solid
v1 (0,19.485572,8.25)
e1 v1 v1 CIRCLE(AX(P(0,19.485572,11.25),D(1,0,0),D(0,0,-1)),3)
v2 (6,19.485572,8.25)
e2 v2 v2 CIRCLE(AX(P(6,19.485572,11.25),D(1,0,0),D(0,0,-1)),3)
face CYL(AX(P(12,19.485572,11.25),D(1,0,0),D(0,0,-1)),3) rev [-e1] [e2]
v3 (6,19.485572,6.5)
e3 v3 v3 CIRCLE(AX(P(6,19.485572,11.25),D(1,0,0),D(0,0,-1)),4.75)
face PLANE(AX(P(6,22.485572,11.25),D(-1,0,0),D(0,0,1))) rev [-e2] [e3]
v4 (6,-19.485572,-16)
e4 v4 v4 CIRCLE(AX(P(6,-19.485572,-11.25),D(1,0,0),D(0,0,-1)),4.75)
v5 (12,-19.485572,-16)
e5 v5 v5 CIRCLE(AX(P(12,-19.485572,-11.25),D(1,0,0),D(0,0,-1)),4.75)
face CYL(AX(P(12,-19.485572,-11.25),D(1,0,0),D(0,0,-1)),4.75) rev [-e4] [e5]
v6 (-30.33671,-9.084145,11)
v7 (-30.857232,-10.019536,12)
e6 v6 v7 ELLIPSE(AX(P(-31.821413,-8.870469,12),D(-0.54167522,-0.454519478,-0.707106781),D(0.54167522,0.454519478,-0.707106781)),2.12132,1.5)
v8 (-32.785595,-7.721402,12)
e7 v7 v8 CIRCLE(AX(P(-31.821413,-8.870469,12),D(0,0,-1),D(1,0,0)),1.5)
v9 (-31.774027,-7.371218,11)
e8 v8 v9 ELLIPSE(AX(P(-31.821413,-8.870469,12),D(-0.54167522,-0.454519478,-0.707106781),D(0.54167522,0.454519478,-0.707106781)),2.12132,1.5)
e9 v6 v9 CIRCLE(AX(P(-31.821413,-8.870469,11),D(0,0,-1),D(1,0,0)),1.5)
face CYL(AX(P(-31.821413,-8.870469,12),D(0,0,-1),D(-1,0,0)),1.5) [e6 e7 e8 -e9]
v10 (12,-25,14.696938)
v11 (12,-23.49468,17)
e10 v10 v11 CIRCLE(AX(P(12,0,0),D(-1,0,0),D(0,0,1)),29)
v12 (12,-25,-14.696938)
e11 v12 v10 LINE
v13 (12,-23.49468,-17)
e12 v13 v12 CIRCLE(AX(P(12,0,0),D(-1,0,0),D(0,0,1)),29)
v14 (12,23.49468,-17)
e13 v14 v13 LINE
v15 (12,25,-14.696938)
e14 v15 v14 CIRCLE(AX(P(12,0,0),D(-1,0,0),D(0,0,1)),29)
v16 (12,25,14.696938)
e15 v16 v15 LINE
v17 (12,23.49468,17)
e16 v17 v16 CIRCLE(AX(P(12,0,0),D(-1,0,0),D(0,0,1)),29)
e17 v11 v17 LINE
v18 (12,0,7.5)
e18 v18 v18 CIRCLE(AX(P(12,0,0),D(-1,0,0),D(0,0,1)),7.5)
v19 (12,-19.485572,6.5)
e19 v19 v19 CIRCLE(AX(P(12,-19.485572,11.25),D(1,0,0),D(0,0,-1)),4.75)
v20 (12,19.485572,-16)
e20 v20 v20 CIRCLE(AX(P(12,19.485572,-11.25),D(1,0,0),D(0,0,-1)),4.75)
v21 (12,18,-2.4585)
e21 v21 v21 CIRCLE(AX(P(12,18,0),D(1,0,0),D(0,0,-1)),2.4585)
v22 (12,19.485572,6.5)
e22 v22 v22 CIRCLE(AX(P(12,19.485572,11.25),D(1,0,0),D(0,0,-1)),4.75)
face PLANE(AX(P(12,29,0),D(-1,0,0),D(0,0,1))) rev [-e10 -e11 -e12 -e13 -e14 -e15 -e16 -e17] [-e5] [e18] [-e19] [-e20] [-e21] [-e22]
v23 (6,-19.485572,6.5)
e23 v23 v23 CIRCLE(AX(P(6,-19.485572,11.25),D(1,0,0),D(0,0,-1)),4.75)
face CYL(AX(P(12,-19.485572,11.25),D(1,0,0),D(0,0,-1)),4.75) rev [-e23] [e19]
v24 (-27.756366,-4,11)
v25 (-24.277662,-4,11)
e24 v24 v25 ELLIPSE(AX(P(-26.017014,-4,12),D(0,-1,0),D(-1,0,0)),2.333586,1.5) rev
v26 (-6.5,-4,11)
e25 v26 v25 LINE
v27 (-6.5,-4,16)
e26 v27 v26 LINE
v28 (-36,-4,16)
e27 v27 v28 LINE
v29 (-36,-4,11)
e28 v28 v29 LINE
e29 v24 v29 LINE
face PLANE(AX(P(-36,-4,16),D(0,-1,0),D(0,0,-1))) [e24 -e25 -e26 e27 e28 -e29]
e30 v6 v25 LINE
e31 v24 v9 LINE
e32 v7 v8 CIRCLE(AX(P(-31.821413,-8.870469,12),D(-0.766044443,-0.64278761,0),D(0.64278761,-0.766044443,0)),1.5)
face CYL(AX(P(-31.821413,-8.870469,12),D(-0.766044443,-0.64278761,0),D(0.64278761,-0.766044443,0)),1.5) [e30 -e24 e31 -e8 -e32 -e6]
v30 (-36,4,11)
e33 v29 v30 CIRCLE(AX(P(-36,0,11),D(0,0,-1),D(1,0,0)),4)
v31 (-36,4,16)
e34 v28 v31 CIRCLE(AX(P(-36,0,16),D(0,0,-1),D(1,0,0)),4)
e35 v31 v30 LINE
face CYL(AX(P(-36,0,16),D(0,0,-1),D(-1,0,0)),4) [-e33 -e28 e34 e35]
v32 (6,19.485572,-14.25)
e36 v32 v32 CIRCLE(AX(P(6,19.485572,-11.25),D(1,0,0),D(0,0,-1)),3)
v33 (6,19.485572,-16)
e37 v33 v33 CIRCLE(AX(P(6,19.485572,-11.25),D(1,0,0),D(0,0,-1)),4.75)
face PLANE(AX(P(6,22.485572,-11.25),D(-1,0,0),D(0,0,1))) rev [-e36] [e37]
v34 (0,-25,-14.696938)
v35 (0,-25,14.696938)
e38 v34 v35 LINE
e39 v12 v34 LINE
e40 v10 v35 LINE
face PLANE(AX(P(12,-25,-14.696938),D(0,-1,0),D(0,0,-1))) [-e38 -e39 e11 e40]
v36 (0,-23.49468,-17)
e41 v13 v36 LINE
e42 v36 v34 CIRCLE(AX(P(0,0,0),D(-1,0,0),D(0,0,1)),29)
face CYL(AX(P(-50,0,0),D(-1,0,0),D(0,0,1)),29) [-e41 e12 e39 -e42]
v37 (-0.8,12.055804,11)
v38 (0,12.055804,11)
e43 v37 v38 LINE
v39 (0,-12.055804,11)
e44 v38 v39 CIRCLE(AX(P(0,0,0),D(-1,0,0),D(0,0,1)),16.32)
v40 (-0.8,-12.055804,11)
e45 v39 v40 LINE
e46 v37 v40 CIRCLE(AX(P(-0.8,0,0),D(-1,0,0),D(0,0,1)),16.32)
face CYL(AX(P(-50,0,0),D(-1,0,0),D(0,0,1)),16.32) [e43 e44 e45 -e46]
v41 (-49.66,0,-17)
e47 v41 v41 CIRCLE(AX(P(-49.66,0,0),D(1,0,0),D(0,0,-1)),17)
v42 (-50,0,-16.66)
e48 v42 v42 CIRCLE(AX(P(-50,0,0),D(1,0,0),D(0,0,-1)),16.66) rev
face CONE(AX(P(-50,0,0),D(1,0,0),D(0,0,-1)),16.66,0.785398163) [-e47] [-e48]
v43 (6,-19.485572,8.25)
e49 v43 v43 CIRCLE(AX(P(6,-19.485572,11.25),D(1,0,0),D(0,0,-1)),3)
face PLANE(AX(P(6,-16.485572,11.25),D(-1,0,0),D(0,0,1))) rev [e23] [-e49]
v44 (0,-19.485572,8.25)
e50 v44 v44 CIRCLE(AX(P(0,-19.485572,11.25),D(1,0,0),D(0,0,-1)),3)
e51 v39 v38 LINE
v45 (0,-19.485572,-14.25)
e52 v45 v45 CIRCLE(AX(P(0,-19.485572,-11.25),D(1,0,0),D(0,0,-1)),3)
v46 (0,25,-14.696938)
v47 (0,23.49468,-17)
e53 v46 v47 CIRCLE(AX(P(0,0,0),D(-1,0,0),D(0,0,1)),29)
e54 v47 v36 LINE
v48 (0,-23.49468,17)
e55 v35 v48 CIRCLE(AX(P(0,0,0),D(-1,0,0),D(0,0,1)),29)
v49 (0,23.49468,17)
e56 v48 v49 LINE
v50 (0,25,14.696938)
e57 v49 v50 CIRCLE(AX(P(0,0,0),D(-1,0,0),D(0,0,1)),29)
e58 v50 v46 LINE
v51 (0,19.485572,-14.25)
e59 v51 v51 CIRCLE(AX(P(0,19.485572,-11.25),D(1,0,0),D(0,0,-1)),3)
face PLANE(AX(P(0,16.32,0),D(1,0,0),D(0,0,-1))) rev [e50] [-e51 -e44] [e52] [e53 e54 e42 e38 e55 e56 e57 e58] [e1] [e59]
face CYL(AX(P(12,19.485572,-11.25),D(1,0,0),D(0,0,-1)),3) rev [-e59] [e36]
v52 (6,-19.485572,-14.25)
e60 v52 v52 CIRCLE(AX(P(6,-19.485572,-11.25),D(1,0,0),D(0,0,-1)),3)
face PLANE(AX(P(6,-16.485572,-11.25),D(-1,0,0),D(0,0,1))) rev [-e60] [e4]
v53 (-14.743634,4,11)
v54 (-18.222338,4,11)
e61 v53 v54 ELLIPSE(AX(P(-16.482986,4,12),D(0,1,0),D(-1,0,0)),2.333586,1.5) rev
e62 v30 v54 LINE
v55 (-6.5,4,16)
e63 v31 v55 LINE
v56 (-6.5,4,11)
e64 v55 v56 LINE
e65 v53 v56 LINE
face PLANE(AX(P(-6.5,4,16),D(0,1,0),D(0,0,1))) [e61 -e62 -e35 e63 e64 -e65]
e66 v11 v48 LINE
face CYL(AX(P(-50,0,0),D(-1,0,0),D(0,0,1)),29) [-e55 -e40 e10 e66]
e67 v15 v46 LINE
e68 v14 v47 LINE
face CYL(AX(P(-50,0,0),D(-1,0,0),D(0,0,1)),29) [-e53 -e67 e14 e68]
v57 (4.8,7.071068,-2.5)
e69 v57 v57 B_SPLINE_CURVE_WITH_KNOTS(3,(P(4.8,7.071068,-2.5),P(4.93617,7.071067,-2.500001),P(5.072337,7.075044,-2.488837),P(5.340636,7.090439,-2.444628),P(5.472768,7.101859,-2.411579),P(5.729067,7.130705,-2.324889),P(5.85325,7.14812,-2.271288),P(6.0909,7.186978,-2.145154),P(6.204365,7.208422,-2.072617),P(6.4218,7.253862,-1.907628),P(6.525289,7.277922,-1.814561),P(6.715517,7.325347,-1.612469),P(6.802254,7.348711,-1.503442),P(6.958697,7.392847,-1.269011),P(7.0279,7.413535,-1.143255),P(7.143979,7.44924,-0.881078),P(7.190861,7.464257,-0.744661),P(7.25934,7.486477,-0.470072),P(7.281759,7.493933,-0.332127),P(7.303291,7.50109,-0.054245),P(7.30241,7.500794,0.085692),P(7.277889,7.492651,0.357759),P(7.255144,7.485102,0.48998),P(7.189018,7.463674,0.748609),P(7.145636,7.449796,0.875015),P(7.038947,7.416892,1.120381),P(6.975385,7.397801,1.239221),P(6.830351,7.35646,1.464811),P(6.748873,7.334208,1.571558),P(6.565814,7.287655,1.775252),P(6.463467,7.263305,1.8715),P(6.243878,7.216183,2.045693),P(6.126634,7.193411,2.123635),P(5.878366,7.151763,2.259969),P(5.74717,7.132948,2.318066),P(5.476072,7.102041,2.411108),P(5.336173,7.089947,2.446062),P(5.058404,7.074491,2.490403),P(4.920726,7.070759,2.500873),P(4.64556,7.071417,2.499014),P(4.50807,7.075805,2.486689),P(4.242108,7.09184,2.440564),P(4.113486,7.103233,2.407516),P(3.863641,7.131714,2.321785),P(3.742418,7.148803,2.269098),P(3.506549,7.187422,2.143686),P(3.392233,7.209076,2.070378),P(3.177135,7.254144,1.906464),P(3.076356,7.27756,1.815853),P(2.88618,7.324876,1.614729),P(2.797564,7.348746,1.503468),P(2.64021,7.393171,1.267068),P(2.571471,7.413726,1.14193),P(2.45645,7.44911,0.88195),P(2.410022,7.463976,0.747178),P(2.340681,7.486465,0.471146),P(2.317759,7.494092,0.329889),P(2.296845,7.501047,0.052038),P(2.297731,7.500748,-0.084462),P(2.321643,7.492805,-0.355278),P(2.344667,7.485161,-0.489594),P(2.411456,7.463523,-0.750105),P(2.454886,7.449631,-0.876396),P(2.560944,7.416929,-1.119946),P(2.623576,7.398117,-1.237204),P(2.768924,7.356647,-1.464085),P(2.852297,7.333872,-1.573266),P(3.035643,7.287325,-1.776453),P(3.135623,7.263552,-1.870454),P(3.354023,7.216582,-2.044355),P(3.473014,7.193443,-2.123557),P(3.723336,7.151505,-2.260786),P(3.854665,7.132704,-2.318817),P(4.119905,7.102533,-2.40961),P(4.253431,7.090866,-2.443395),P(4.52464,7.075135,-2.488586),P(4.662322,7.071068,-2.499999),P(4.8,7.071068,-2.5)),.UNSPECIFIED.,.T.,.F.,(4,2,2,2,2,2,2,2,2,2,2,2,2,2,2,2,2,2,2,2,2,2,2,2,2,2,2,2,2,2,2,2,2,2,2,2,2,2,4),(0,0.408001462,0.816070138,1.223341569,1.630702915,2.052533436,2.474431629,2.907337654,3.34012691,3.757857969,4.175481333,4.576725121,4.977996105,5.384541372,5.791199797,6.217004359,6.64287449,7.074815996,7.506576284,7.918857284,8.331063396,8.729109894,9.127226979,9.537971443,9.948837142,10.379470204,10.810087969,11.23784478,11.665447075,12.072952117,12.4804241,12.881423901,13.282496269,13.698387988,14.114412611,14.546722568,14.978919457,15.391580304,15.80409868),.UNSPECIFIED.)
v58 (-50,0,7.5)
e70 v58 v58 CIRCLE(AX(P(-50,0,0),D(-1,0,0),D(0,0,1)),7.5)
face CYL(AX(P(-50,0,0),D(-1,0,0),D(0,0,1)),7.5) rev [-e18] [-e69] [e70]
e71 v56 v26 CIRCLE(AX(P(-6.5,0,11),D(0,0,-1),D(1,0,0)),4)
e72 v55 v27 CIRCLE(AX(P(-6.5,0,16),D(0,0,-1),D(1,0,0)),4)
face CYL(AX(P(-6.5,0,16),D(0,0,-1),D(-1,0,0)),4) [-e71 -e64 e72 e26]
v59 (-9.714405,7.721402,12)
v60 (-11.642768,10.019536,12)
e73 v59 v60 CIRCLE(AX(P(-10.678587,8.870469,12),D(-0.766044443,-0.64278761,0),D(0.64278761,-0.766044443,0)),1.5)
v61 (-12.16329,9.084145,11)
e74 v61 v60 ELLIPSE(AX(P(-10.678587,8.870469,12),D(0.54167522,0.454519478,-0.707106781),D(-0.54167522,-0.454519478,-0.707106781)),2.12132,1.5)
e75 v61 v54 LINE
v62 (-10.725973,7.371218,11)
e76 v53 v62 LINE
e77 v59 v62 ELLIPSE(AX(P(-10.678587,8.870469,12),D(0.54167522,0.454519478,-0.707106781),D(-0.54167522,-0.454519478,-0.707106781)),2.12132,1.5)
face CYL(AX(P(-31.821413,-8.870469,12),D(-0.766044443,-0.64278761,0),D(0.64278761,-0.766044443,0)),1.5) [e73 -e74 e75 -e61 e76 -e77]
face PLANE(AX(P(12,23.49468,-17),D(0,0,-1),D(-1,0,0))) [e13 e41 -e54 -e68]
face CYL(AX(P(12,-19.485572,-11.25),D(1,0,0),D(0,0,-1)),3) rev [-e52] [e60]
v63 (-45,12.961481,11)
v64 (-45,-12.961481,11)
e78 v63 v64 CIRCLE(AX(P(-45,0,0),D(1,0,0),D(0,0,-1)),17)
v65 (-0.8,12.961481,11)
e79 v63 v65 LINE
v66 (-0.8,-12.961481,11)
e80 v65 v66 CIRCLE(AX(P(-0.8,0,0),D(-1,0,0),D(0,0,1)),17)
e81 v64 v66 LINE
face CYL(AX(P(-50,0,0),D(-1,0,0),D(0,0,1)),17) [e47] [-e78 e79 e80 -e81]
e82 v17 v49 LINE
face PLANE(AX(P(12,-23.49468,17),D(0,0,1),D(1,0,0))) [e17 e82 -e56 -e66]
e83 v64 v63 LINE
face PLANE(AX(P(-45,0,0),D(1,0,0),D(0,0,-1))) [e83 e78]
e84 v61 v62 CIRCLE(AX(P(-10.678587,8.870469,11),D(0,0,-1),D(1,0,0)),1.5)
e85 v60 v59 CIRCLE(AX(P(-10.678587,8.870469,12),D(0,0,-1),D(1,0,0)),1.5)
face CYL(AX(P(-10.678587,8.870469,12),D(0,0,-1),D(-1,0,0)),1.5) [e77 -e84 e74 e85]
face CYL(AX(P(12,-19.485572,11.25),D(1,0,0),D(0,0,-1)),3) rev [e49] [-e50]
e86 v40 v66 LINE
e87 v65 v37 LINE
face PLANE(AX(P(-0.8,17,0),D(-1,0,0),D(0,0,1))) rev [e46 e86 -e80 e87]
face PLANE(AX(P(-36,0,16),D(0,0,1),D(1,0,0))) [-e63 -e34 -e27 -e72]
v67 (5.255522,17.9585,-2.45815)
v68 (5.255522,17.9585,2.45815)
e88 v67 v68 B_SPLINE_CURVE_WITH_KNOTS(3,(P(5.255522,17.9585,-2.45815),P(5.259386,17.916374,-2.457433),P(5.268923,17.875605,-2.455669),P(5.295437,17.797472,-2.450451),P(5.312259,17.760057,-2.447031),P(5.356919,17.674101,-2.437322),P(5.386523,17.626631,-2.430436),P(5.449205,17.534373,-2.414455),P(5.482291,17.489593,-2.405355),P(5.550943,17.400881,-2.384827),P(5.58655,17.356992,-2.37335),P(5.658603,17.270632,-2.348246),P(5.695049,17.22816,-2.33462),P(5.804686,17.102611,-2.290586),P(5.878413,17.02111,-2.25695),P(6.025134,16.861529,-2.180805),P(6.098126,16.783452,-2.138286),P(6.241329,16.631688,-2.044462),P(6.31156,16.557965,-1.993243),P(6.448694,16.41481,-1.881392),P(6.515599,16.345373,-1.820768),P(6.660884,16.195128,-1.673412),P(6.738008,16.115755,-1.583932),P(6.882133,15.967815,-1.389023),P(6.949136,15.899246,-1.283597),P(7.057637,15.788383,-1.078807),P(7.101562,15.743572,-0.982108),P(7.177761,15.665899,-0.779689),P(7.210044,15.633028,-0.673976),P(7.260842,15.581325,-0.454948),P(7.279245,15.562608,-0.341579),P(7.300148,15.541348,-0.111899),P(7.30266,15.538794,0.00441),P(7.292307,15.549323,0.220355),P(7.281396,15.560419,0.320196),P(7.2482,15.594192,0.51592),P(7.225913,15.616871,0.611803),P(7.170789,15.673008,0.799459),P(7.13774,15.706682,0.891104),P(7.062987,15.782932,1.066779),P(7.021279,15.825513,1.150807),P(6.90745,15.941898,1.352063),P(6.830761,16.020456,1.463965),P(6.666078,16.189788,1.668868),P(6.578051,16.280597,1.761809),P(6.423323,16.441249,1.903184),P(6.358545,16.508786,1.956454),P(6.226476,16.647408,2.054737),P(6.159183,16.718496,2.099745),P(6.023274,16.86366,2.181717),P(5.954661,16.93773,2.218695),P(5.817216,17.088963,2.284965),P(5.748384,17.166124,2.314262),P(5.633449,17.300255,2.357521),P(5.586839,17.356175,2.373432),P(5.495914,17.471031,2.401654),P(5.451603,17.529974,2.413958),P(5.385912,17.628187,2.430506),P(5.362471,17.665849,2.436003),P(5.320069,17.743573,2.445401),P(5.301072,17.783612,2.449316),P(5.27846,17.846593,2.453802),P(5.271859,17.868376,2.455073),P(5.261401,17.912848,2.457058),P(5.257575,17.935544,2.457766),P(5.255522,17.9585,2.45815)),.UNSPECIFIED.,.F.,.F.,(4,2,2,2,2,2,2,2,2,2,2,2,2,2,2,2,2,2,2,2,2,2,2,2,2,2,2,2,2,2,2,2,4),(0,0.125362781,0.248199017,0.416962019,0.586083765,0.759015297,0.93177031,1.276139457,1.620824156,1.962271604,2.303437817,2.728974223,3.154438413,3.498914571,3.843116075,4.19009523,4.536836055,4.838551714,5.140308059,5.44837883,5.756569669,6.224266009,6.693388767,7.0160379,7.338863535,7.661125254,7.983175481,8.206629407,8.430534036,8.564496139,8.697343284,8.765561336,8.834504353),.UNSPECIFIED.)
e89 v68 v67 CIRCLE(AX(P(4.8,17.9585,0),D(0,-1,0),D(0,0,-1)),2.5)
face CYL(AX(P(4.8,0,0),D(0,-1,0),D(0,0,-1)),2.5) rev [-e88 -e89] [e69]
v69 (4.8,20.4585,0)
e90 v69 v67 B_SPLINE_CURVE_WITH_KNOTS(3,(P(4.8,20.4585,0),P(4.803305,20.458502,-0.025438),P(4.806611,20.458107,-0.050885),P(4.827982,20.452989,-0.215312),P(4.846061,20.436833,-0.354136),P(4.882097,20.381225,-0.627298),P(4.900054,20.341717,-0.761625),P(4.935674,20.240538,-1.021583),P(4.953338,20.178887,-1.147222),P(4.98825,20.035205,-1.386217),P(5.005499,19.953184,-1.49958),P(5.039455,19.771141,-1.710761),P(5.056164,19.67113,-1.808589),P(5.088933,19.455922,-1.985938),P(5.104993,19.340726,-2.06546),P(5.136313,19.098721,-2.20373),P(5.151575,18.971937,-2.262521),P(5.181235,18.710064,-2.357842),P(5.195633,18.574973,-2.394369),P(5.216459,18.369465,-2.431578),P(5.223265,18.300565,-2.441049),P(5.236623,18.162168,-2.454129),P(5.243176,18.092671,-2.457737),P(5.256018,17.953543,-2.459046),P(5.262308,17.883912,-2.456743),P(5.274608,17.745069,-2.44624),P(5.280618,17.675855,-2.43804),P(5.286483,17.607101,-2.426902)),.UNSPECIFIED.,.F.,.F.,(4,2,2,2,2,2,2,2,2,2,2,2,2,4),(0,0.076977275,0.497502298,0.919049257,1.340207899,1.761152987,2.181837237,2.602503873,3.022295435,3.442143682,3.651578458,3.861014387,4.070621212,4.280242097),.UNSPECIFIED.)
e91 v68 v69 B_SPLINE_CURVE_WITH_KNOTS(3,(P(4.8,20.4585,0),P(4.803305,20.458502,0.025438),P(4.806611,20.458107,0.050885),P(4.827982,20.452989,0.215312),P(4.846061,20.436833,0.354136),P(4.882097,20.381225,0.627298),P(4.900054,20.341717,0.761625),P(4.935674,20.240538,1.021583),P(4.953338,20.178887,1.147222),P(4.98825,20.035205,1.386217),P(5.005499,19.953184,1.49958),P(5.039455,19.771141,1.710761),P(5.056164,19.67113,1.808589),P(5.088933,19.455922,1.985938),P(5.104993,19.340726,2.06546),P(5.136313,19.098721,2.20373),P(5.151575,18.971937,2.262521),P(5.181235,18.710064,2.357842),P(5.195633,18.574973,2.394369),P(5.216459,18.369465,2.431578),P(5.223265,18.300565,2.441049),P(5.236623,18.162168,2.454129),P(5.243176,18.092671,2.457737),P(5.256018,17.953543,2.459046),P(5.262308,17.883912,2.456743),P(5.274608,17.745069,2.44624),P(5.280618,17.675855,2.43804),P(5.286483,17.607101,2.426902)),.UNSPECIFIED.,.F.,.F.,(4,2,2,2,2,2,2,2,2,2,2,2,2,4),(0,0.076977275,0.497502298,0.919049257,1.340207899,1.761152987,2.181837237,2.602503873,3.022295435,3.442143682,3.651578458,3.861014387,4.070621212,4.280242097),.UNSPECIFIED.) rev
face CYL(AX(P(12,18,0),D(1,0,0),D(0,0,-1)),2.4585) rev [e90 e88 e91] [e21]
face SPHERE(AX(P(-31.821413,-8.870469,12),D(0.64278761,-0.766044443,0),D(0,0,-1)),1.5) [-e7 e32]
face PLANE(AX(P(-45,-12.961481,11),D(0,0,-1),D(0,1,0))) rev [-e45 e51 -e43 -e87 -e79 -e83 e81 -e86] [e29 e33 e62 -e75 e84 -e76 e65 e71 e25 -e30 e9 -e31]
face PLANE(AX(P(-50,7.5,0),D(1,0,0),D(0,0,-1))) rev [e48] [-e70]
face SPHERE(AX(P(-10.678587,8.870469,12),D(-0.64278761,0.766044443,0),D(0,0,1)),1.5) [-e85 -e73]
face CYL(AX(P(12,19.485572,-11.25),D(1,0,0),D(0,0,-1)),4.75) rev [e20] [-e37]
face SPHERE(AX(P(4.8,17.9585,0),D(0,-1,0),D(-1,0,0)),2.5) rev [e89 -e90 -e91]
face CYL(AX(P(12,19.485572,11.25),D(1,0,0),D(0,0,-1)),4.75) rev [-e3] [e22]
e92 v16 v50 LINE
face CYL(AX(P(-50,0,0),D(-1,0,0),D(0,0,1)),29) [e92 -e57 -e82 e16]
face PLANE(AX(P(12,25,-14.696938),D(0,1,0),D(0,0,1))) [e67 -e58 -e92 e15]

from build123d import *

# Parameters (mm, degrees)
CUT_EXTRUDE1_DEPTH                 = 65.668384857
CHAMFER1_SIZE                      = 0.34
SOCKET_HEAD_CAP_SCREW1_D           = 6
SOCKET_HEAD_CAP_SCREW1_CBORE_D     = 9.5
SOCKET_HEAD_CAP_SCREW1_CBORE_DEPTH = 6
CUT_EXTRUDE2_DEPTH                 = 45
BOSS_EXTRUDE1_DEPTH                = 5
SKETCH7_R                          = 1.5
BOSS_EXTRUDE2_DEPTH                = 1
REVOLVE3_ANGLE                     = 90
REVOLVE4_ANGLE                     = 90
TAP1_START                         = 4.7999999
TAP1_OUTLINE_R                     = 2.4585
TAP1_DEPTH                         = 7.2000001


# Read off the part's stored shape, not the designer's step: Tap1
with BuildPart() as part:
    # Sketch1 → Revolve1 (revolve)
    with BuildSketch(Plane.XY, mode=Mode.PRIVATE) as revolve1_sk:
        Polygon((0, 29), (12, 29), (12, 7.5), (-50, 7.5), (-50, 17), (-0.8, 17), (-0.8, 16.32), (0, 16.32), align=None)
    revolve(revolve1_sk.sketch.rotate(Axis((-50, 0, 0), (1, 0, 0)), 90), axis=Axis((-50, 0, 0), (1, 0, 0)))

    # Sketch2 → Cut-Extrude1 (cut, through all)
    with BuildSketch(Plane(origin=(0, 0, 0), x_dir=(0, 0, -1), z_dir=(1, 0, 0))):
        with BuildLine():
            Line((14.696938457, 25), (-14.696938457, 25))
            ThreePointArc((-14.696938457, 25), (0, 29), (14.696938457, 25))
        make_face()
        with BuildLine():
            Line((17, 23.494680249), (17, -23.494680249))
            ThreePointArc((17, -23.494680249), (29, 0), (17, 23.494680249))
        make_face()
        with BuildLine():
            Line((14.696938457, -25), (-14.696938457, -25))
            ThreePointArc((-14.696938457, -25), (0, -29), (14.696938457, -25))
        make_face()
        with BuildLine():
            Line((-17, -23.494680249), (-17, 23.494680249))
            ThreePointArc((-17, 23.494680249), (-29, 0), (-17, -23.494680249))
        make_face()
    extrude(amount=CUT_EXTRUDE1_DEPTH, mode=Mode.SUBTRACT)

    # Chamfer1
    chamfer1_edges = [part.edges().sort_by_distance(p)[0] for p in [
        (-50, 0, -17),
    ]]
    chamfer(chamfer1_edges, length=CHAMFER1_SIZE)

    # Socket Head Cap Screw1 (through all)
    with Locations(Plane(origin=(12, 0, 0), x_dir=(0, 0, -1), z_dir=(1, 0, 0))):
        with Locations((-11.25, 19.485571585), (11.25, -19.485571585), (-11.25, -19.485571585), (11.25, 19.485571585)):
            CounterBoreHole(SOCKET_HEAD_CAP_SCREW1_D / 2, SOCKET_HEAD_CAP_SCREW1_CBORE_D / 2, SOCKET_HEAD_CAP_SCREW1_CBORE_DEPTH)

    # Sketch5 → Cut-Extrude2 (cut)
    with BuildSketch(Plane(origin=(0, 0, 0), x_dir=(0, 0, -1), z_dir=(1, 0, 0))):
        with BuildLine():
            Line((-11, -12.961481397), (-11, 12.961481397))
            ThreePointArc((-11, 12.961481397), (-17, 0), (-11, -12.961481397))
        make_face()
    extrude(amount=-CUT_EXTRUDE2_DEPTH, mode=Mode.SUBTRACT)

    # Sketch6 → Boss-Extrude1 (add)
    with BuildSketch(Plane(origin=(0, 0, 11), x_dir=(-1, 0, 0), z_dir=(0, 0, -1))):
        with BuildLine():
            Line((6.5, 4), (36, 4))
            ThreePointArc((36, 4), (40, 0), (36, -4))
            Line((36, -4), (6.5, -4))
            ThreePointArc((6.5, -4), (2.5, 0), (6.5, 4))
        make_face()
    extrude(amount=-BOSS_EXTRUDE1_DEPTH)

    # Sketch7 → Boss-Extrude2 (add)
    with BuildSketch(Plane(origin=(0, 0, 11), x_dir=(-1, 0, 0), z_dir=(0, 0, -1))):
        with Locations(Location((31.821413315, -8.870469014, 0), (0, 0, 180))):
            Circle(SKETCH7_R)
        with Locations(Location((10.678586685, 8.870469014, 0), (0, 0, 180))):
            Circle(SKETCH7_R)
    extrude(amount=-BOSS_EXTRUDE2_DEPTH)

    # Sketch8 → Revolve2 (revolve)
    with BuildSketch(Plane.XY.offset(12)):
        Polygon((-31.821413315, -8.870469014), (-10.678586685, 8.870469014), (-11.642768099, 10.019535678), (-32.78559473, -7.721402349), align=None)
    revolve(axis=Axis((-31.821413315, -8.870469014, 12), (0.7660444431189781, 0.6427876096865394, 0)))

    # Sketch9 → Revolve3 (revolve)
    with BuildSketch(Plane.XY.offset(12)):
        with BuildLine():
            Line((-30.857231901, -10.019535678), (-32.78559473, -7.721402349))
            ThreePointArc((-32.78559473, -7.721402349), (-32.97047998, -9.834650428), (-30.857231901, -10.019535678))
        make_face()
    revolve(axis=Axis((-30.857231901, -10.019535678, 12), (-0.6427876096865415, 0.7660444431189763, 0)), revolution_arc=REVOLVE3_ANGLE)

    # Sketch10 → Revolve4 (revolve)
    with BuildSketch(Plane.XY.offset(12)):
        with BuildLine():
            Line((-11.642768099, 10.019535678), (-9.71440527, 7.721402349))
            ThreePointArc((-9.71440527, 7.721402349), (-9.52952002, 9.834650428), (-11.642768099, 10.019535678))
        make_face()
    revolve(axis=Axis((-11.642768099, 10.019535678, 12), (0.6427876096865339, -0.7660444431189826, 0)), revolution_arc=REVOLVE4_ANGLE)

    # Sketch11 → Cut-Revolve1 (revolve, cut)
    with BuildSketch(Plane.XY, mode=Mode.PRIVATE) as cut_revolve1_sk:
        with BuildLine():
            Line((2.3, 0), (4.8, 0))
            Line((4.8, 0), (4.8, 20.4585))
            ThreePointArc((4.8, 20.4585), (3.032233047, 19.726266953), (2.3, 17.9585))
            Line((2.3, 17.9585), (2.3, 0))
        make_face()
    revolve(cut_revolve1_sk.sketch.rotate(Axis((4.8, 0, 0), (0, 1, 0)), 270), axis=Axis((4.8, 0, 0), (0, 1, 0)), mode=Mode.SUBTRACT)

    # Tap1 outline → Tap1 (cut)
    with BuildSketch(Plane.YZ.offset(TAP1_START)):
        with Locations((18, 0)):
            Circle(TAP1_OUTLINE_R)
    extrude(amount=TAP1_DEPTH, mode=Mode.SUBTRACT)


solid = part.part
